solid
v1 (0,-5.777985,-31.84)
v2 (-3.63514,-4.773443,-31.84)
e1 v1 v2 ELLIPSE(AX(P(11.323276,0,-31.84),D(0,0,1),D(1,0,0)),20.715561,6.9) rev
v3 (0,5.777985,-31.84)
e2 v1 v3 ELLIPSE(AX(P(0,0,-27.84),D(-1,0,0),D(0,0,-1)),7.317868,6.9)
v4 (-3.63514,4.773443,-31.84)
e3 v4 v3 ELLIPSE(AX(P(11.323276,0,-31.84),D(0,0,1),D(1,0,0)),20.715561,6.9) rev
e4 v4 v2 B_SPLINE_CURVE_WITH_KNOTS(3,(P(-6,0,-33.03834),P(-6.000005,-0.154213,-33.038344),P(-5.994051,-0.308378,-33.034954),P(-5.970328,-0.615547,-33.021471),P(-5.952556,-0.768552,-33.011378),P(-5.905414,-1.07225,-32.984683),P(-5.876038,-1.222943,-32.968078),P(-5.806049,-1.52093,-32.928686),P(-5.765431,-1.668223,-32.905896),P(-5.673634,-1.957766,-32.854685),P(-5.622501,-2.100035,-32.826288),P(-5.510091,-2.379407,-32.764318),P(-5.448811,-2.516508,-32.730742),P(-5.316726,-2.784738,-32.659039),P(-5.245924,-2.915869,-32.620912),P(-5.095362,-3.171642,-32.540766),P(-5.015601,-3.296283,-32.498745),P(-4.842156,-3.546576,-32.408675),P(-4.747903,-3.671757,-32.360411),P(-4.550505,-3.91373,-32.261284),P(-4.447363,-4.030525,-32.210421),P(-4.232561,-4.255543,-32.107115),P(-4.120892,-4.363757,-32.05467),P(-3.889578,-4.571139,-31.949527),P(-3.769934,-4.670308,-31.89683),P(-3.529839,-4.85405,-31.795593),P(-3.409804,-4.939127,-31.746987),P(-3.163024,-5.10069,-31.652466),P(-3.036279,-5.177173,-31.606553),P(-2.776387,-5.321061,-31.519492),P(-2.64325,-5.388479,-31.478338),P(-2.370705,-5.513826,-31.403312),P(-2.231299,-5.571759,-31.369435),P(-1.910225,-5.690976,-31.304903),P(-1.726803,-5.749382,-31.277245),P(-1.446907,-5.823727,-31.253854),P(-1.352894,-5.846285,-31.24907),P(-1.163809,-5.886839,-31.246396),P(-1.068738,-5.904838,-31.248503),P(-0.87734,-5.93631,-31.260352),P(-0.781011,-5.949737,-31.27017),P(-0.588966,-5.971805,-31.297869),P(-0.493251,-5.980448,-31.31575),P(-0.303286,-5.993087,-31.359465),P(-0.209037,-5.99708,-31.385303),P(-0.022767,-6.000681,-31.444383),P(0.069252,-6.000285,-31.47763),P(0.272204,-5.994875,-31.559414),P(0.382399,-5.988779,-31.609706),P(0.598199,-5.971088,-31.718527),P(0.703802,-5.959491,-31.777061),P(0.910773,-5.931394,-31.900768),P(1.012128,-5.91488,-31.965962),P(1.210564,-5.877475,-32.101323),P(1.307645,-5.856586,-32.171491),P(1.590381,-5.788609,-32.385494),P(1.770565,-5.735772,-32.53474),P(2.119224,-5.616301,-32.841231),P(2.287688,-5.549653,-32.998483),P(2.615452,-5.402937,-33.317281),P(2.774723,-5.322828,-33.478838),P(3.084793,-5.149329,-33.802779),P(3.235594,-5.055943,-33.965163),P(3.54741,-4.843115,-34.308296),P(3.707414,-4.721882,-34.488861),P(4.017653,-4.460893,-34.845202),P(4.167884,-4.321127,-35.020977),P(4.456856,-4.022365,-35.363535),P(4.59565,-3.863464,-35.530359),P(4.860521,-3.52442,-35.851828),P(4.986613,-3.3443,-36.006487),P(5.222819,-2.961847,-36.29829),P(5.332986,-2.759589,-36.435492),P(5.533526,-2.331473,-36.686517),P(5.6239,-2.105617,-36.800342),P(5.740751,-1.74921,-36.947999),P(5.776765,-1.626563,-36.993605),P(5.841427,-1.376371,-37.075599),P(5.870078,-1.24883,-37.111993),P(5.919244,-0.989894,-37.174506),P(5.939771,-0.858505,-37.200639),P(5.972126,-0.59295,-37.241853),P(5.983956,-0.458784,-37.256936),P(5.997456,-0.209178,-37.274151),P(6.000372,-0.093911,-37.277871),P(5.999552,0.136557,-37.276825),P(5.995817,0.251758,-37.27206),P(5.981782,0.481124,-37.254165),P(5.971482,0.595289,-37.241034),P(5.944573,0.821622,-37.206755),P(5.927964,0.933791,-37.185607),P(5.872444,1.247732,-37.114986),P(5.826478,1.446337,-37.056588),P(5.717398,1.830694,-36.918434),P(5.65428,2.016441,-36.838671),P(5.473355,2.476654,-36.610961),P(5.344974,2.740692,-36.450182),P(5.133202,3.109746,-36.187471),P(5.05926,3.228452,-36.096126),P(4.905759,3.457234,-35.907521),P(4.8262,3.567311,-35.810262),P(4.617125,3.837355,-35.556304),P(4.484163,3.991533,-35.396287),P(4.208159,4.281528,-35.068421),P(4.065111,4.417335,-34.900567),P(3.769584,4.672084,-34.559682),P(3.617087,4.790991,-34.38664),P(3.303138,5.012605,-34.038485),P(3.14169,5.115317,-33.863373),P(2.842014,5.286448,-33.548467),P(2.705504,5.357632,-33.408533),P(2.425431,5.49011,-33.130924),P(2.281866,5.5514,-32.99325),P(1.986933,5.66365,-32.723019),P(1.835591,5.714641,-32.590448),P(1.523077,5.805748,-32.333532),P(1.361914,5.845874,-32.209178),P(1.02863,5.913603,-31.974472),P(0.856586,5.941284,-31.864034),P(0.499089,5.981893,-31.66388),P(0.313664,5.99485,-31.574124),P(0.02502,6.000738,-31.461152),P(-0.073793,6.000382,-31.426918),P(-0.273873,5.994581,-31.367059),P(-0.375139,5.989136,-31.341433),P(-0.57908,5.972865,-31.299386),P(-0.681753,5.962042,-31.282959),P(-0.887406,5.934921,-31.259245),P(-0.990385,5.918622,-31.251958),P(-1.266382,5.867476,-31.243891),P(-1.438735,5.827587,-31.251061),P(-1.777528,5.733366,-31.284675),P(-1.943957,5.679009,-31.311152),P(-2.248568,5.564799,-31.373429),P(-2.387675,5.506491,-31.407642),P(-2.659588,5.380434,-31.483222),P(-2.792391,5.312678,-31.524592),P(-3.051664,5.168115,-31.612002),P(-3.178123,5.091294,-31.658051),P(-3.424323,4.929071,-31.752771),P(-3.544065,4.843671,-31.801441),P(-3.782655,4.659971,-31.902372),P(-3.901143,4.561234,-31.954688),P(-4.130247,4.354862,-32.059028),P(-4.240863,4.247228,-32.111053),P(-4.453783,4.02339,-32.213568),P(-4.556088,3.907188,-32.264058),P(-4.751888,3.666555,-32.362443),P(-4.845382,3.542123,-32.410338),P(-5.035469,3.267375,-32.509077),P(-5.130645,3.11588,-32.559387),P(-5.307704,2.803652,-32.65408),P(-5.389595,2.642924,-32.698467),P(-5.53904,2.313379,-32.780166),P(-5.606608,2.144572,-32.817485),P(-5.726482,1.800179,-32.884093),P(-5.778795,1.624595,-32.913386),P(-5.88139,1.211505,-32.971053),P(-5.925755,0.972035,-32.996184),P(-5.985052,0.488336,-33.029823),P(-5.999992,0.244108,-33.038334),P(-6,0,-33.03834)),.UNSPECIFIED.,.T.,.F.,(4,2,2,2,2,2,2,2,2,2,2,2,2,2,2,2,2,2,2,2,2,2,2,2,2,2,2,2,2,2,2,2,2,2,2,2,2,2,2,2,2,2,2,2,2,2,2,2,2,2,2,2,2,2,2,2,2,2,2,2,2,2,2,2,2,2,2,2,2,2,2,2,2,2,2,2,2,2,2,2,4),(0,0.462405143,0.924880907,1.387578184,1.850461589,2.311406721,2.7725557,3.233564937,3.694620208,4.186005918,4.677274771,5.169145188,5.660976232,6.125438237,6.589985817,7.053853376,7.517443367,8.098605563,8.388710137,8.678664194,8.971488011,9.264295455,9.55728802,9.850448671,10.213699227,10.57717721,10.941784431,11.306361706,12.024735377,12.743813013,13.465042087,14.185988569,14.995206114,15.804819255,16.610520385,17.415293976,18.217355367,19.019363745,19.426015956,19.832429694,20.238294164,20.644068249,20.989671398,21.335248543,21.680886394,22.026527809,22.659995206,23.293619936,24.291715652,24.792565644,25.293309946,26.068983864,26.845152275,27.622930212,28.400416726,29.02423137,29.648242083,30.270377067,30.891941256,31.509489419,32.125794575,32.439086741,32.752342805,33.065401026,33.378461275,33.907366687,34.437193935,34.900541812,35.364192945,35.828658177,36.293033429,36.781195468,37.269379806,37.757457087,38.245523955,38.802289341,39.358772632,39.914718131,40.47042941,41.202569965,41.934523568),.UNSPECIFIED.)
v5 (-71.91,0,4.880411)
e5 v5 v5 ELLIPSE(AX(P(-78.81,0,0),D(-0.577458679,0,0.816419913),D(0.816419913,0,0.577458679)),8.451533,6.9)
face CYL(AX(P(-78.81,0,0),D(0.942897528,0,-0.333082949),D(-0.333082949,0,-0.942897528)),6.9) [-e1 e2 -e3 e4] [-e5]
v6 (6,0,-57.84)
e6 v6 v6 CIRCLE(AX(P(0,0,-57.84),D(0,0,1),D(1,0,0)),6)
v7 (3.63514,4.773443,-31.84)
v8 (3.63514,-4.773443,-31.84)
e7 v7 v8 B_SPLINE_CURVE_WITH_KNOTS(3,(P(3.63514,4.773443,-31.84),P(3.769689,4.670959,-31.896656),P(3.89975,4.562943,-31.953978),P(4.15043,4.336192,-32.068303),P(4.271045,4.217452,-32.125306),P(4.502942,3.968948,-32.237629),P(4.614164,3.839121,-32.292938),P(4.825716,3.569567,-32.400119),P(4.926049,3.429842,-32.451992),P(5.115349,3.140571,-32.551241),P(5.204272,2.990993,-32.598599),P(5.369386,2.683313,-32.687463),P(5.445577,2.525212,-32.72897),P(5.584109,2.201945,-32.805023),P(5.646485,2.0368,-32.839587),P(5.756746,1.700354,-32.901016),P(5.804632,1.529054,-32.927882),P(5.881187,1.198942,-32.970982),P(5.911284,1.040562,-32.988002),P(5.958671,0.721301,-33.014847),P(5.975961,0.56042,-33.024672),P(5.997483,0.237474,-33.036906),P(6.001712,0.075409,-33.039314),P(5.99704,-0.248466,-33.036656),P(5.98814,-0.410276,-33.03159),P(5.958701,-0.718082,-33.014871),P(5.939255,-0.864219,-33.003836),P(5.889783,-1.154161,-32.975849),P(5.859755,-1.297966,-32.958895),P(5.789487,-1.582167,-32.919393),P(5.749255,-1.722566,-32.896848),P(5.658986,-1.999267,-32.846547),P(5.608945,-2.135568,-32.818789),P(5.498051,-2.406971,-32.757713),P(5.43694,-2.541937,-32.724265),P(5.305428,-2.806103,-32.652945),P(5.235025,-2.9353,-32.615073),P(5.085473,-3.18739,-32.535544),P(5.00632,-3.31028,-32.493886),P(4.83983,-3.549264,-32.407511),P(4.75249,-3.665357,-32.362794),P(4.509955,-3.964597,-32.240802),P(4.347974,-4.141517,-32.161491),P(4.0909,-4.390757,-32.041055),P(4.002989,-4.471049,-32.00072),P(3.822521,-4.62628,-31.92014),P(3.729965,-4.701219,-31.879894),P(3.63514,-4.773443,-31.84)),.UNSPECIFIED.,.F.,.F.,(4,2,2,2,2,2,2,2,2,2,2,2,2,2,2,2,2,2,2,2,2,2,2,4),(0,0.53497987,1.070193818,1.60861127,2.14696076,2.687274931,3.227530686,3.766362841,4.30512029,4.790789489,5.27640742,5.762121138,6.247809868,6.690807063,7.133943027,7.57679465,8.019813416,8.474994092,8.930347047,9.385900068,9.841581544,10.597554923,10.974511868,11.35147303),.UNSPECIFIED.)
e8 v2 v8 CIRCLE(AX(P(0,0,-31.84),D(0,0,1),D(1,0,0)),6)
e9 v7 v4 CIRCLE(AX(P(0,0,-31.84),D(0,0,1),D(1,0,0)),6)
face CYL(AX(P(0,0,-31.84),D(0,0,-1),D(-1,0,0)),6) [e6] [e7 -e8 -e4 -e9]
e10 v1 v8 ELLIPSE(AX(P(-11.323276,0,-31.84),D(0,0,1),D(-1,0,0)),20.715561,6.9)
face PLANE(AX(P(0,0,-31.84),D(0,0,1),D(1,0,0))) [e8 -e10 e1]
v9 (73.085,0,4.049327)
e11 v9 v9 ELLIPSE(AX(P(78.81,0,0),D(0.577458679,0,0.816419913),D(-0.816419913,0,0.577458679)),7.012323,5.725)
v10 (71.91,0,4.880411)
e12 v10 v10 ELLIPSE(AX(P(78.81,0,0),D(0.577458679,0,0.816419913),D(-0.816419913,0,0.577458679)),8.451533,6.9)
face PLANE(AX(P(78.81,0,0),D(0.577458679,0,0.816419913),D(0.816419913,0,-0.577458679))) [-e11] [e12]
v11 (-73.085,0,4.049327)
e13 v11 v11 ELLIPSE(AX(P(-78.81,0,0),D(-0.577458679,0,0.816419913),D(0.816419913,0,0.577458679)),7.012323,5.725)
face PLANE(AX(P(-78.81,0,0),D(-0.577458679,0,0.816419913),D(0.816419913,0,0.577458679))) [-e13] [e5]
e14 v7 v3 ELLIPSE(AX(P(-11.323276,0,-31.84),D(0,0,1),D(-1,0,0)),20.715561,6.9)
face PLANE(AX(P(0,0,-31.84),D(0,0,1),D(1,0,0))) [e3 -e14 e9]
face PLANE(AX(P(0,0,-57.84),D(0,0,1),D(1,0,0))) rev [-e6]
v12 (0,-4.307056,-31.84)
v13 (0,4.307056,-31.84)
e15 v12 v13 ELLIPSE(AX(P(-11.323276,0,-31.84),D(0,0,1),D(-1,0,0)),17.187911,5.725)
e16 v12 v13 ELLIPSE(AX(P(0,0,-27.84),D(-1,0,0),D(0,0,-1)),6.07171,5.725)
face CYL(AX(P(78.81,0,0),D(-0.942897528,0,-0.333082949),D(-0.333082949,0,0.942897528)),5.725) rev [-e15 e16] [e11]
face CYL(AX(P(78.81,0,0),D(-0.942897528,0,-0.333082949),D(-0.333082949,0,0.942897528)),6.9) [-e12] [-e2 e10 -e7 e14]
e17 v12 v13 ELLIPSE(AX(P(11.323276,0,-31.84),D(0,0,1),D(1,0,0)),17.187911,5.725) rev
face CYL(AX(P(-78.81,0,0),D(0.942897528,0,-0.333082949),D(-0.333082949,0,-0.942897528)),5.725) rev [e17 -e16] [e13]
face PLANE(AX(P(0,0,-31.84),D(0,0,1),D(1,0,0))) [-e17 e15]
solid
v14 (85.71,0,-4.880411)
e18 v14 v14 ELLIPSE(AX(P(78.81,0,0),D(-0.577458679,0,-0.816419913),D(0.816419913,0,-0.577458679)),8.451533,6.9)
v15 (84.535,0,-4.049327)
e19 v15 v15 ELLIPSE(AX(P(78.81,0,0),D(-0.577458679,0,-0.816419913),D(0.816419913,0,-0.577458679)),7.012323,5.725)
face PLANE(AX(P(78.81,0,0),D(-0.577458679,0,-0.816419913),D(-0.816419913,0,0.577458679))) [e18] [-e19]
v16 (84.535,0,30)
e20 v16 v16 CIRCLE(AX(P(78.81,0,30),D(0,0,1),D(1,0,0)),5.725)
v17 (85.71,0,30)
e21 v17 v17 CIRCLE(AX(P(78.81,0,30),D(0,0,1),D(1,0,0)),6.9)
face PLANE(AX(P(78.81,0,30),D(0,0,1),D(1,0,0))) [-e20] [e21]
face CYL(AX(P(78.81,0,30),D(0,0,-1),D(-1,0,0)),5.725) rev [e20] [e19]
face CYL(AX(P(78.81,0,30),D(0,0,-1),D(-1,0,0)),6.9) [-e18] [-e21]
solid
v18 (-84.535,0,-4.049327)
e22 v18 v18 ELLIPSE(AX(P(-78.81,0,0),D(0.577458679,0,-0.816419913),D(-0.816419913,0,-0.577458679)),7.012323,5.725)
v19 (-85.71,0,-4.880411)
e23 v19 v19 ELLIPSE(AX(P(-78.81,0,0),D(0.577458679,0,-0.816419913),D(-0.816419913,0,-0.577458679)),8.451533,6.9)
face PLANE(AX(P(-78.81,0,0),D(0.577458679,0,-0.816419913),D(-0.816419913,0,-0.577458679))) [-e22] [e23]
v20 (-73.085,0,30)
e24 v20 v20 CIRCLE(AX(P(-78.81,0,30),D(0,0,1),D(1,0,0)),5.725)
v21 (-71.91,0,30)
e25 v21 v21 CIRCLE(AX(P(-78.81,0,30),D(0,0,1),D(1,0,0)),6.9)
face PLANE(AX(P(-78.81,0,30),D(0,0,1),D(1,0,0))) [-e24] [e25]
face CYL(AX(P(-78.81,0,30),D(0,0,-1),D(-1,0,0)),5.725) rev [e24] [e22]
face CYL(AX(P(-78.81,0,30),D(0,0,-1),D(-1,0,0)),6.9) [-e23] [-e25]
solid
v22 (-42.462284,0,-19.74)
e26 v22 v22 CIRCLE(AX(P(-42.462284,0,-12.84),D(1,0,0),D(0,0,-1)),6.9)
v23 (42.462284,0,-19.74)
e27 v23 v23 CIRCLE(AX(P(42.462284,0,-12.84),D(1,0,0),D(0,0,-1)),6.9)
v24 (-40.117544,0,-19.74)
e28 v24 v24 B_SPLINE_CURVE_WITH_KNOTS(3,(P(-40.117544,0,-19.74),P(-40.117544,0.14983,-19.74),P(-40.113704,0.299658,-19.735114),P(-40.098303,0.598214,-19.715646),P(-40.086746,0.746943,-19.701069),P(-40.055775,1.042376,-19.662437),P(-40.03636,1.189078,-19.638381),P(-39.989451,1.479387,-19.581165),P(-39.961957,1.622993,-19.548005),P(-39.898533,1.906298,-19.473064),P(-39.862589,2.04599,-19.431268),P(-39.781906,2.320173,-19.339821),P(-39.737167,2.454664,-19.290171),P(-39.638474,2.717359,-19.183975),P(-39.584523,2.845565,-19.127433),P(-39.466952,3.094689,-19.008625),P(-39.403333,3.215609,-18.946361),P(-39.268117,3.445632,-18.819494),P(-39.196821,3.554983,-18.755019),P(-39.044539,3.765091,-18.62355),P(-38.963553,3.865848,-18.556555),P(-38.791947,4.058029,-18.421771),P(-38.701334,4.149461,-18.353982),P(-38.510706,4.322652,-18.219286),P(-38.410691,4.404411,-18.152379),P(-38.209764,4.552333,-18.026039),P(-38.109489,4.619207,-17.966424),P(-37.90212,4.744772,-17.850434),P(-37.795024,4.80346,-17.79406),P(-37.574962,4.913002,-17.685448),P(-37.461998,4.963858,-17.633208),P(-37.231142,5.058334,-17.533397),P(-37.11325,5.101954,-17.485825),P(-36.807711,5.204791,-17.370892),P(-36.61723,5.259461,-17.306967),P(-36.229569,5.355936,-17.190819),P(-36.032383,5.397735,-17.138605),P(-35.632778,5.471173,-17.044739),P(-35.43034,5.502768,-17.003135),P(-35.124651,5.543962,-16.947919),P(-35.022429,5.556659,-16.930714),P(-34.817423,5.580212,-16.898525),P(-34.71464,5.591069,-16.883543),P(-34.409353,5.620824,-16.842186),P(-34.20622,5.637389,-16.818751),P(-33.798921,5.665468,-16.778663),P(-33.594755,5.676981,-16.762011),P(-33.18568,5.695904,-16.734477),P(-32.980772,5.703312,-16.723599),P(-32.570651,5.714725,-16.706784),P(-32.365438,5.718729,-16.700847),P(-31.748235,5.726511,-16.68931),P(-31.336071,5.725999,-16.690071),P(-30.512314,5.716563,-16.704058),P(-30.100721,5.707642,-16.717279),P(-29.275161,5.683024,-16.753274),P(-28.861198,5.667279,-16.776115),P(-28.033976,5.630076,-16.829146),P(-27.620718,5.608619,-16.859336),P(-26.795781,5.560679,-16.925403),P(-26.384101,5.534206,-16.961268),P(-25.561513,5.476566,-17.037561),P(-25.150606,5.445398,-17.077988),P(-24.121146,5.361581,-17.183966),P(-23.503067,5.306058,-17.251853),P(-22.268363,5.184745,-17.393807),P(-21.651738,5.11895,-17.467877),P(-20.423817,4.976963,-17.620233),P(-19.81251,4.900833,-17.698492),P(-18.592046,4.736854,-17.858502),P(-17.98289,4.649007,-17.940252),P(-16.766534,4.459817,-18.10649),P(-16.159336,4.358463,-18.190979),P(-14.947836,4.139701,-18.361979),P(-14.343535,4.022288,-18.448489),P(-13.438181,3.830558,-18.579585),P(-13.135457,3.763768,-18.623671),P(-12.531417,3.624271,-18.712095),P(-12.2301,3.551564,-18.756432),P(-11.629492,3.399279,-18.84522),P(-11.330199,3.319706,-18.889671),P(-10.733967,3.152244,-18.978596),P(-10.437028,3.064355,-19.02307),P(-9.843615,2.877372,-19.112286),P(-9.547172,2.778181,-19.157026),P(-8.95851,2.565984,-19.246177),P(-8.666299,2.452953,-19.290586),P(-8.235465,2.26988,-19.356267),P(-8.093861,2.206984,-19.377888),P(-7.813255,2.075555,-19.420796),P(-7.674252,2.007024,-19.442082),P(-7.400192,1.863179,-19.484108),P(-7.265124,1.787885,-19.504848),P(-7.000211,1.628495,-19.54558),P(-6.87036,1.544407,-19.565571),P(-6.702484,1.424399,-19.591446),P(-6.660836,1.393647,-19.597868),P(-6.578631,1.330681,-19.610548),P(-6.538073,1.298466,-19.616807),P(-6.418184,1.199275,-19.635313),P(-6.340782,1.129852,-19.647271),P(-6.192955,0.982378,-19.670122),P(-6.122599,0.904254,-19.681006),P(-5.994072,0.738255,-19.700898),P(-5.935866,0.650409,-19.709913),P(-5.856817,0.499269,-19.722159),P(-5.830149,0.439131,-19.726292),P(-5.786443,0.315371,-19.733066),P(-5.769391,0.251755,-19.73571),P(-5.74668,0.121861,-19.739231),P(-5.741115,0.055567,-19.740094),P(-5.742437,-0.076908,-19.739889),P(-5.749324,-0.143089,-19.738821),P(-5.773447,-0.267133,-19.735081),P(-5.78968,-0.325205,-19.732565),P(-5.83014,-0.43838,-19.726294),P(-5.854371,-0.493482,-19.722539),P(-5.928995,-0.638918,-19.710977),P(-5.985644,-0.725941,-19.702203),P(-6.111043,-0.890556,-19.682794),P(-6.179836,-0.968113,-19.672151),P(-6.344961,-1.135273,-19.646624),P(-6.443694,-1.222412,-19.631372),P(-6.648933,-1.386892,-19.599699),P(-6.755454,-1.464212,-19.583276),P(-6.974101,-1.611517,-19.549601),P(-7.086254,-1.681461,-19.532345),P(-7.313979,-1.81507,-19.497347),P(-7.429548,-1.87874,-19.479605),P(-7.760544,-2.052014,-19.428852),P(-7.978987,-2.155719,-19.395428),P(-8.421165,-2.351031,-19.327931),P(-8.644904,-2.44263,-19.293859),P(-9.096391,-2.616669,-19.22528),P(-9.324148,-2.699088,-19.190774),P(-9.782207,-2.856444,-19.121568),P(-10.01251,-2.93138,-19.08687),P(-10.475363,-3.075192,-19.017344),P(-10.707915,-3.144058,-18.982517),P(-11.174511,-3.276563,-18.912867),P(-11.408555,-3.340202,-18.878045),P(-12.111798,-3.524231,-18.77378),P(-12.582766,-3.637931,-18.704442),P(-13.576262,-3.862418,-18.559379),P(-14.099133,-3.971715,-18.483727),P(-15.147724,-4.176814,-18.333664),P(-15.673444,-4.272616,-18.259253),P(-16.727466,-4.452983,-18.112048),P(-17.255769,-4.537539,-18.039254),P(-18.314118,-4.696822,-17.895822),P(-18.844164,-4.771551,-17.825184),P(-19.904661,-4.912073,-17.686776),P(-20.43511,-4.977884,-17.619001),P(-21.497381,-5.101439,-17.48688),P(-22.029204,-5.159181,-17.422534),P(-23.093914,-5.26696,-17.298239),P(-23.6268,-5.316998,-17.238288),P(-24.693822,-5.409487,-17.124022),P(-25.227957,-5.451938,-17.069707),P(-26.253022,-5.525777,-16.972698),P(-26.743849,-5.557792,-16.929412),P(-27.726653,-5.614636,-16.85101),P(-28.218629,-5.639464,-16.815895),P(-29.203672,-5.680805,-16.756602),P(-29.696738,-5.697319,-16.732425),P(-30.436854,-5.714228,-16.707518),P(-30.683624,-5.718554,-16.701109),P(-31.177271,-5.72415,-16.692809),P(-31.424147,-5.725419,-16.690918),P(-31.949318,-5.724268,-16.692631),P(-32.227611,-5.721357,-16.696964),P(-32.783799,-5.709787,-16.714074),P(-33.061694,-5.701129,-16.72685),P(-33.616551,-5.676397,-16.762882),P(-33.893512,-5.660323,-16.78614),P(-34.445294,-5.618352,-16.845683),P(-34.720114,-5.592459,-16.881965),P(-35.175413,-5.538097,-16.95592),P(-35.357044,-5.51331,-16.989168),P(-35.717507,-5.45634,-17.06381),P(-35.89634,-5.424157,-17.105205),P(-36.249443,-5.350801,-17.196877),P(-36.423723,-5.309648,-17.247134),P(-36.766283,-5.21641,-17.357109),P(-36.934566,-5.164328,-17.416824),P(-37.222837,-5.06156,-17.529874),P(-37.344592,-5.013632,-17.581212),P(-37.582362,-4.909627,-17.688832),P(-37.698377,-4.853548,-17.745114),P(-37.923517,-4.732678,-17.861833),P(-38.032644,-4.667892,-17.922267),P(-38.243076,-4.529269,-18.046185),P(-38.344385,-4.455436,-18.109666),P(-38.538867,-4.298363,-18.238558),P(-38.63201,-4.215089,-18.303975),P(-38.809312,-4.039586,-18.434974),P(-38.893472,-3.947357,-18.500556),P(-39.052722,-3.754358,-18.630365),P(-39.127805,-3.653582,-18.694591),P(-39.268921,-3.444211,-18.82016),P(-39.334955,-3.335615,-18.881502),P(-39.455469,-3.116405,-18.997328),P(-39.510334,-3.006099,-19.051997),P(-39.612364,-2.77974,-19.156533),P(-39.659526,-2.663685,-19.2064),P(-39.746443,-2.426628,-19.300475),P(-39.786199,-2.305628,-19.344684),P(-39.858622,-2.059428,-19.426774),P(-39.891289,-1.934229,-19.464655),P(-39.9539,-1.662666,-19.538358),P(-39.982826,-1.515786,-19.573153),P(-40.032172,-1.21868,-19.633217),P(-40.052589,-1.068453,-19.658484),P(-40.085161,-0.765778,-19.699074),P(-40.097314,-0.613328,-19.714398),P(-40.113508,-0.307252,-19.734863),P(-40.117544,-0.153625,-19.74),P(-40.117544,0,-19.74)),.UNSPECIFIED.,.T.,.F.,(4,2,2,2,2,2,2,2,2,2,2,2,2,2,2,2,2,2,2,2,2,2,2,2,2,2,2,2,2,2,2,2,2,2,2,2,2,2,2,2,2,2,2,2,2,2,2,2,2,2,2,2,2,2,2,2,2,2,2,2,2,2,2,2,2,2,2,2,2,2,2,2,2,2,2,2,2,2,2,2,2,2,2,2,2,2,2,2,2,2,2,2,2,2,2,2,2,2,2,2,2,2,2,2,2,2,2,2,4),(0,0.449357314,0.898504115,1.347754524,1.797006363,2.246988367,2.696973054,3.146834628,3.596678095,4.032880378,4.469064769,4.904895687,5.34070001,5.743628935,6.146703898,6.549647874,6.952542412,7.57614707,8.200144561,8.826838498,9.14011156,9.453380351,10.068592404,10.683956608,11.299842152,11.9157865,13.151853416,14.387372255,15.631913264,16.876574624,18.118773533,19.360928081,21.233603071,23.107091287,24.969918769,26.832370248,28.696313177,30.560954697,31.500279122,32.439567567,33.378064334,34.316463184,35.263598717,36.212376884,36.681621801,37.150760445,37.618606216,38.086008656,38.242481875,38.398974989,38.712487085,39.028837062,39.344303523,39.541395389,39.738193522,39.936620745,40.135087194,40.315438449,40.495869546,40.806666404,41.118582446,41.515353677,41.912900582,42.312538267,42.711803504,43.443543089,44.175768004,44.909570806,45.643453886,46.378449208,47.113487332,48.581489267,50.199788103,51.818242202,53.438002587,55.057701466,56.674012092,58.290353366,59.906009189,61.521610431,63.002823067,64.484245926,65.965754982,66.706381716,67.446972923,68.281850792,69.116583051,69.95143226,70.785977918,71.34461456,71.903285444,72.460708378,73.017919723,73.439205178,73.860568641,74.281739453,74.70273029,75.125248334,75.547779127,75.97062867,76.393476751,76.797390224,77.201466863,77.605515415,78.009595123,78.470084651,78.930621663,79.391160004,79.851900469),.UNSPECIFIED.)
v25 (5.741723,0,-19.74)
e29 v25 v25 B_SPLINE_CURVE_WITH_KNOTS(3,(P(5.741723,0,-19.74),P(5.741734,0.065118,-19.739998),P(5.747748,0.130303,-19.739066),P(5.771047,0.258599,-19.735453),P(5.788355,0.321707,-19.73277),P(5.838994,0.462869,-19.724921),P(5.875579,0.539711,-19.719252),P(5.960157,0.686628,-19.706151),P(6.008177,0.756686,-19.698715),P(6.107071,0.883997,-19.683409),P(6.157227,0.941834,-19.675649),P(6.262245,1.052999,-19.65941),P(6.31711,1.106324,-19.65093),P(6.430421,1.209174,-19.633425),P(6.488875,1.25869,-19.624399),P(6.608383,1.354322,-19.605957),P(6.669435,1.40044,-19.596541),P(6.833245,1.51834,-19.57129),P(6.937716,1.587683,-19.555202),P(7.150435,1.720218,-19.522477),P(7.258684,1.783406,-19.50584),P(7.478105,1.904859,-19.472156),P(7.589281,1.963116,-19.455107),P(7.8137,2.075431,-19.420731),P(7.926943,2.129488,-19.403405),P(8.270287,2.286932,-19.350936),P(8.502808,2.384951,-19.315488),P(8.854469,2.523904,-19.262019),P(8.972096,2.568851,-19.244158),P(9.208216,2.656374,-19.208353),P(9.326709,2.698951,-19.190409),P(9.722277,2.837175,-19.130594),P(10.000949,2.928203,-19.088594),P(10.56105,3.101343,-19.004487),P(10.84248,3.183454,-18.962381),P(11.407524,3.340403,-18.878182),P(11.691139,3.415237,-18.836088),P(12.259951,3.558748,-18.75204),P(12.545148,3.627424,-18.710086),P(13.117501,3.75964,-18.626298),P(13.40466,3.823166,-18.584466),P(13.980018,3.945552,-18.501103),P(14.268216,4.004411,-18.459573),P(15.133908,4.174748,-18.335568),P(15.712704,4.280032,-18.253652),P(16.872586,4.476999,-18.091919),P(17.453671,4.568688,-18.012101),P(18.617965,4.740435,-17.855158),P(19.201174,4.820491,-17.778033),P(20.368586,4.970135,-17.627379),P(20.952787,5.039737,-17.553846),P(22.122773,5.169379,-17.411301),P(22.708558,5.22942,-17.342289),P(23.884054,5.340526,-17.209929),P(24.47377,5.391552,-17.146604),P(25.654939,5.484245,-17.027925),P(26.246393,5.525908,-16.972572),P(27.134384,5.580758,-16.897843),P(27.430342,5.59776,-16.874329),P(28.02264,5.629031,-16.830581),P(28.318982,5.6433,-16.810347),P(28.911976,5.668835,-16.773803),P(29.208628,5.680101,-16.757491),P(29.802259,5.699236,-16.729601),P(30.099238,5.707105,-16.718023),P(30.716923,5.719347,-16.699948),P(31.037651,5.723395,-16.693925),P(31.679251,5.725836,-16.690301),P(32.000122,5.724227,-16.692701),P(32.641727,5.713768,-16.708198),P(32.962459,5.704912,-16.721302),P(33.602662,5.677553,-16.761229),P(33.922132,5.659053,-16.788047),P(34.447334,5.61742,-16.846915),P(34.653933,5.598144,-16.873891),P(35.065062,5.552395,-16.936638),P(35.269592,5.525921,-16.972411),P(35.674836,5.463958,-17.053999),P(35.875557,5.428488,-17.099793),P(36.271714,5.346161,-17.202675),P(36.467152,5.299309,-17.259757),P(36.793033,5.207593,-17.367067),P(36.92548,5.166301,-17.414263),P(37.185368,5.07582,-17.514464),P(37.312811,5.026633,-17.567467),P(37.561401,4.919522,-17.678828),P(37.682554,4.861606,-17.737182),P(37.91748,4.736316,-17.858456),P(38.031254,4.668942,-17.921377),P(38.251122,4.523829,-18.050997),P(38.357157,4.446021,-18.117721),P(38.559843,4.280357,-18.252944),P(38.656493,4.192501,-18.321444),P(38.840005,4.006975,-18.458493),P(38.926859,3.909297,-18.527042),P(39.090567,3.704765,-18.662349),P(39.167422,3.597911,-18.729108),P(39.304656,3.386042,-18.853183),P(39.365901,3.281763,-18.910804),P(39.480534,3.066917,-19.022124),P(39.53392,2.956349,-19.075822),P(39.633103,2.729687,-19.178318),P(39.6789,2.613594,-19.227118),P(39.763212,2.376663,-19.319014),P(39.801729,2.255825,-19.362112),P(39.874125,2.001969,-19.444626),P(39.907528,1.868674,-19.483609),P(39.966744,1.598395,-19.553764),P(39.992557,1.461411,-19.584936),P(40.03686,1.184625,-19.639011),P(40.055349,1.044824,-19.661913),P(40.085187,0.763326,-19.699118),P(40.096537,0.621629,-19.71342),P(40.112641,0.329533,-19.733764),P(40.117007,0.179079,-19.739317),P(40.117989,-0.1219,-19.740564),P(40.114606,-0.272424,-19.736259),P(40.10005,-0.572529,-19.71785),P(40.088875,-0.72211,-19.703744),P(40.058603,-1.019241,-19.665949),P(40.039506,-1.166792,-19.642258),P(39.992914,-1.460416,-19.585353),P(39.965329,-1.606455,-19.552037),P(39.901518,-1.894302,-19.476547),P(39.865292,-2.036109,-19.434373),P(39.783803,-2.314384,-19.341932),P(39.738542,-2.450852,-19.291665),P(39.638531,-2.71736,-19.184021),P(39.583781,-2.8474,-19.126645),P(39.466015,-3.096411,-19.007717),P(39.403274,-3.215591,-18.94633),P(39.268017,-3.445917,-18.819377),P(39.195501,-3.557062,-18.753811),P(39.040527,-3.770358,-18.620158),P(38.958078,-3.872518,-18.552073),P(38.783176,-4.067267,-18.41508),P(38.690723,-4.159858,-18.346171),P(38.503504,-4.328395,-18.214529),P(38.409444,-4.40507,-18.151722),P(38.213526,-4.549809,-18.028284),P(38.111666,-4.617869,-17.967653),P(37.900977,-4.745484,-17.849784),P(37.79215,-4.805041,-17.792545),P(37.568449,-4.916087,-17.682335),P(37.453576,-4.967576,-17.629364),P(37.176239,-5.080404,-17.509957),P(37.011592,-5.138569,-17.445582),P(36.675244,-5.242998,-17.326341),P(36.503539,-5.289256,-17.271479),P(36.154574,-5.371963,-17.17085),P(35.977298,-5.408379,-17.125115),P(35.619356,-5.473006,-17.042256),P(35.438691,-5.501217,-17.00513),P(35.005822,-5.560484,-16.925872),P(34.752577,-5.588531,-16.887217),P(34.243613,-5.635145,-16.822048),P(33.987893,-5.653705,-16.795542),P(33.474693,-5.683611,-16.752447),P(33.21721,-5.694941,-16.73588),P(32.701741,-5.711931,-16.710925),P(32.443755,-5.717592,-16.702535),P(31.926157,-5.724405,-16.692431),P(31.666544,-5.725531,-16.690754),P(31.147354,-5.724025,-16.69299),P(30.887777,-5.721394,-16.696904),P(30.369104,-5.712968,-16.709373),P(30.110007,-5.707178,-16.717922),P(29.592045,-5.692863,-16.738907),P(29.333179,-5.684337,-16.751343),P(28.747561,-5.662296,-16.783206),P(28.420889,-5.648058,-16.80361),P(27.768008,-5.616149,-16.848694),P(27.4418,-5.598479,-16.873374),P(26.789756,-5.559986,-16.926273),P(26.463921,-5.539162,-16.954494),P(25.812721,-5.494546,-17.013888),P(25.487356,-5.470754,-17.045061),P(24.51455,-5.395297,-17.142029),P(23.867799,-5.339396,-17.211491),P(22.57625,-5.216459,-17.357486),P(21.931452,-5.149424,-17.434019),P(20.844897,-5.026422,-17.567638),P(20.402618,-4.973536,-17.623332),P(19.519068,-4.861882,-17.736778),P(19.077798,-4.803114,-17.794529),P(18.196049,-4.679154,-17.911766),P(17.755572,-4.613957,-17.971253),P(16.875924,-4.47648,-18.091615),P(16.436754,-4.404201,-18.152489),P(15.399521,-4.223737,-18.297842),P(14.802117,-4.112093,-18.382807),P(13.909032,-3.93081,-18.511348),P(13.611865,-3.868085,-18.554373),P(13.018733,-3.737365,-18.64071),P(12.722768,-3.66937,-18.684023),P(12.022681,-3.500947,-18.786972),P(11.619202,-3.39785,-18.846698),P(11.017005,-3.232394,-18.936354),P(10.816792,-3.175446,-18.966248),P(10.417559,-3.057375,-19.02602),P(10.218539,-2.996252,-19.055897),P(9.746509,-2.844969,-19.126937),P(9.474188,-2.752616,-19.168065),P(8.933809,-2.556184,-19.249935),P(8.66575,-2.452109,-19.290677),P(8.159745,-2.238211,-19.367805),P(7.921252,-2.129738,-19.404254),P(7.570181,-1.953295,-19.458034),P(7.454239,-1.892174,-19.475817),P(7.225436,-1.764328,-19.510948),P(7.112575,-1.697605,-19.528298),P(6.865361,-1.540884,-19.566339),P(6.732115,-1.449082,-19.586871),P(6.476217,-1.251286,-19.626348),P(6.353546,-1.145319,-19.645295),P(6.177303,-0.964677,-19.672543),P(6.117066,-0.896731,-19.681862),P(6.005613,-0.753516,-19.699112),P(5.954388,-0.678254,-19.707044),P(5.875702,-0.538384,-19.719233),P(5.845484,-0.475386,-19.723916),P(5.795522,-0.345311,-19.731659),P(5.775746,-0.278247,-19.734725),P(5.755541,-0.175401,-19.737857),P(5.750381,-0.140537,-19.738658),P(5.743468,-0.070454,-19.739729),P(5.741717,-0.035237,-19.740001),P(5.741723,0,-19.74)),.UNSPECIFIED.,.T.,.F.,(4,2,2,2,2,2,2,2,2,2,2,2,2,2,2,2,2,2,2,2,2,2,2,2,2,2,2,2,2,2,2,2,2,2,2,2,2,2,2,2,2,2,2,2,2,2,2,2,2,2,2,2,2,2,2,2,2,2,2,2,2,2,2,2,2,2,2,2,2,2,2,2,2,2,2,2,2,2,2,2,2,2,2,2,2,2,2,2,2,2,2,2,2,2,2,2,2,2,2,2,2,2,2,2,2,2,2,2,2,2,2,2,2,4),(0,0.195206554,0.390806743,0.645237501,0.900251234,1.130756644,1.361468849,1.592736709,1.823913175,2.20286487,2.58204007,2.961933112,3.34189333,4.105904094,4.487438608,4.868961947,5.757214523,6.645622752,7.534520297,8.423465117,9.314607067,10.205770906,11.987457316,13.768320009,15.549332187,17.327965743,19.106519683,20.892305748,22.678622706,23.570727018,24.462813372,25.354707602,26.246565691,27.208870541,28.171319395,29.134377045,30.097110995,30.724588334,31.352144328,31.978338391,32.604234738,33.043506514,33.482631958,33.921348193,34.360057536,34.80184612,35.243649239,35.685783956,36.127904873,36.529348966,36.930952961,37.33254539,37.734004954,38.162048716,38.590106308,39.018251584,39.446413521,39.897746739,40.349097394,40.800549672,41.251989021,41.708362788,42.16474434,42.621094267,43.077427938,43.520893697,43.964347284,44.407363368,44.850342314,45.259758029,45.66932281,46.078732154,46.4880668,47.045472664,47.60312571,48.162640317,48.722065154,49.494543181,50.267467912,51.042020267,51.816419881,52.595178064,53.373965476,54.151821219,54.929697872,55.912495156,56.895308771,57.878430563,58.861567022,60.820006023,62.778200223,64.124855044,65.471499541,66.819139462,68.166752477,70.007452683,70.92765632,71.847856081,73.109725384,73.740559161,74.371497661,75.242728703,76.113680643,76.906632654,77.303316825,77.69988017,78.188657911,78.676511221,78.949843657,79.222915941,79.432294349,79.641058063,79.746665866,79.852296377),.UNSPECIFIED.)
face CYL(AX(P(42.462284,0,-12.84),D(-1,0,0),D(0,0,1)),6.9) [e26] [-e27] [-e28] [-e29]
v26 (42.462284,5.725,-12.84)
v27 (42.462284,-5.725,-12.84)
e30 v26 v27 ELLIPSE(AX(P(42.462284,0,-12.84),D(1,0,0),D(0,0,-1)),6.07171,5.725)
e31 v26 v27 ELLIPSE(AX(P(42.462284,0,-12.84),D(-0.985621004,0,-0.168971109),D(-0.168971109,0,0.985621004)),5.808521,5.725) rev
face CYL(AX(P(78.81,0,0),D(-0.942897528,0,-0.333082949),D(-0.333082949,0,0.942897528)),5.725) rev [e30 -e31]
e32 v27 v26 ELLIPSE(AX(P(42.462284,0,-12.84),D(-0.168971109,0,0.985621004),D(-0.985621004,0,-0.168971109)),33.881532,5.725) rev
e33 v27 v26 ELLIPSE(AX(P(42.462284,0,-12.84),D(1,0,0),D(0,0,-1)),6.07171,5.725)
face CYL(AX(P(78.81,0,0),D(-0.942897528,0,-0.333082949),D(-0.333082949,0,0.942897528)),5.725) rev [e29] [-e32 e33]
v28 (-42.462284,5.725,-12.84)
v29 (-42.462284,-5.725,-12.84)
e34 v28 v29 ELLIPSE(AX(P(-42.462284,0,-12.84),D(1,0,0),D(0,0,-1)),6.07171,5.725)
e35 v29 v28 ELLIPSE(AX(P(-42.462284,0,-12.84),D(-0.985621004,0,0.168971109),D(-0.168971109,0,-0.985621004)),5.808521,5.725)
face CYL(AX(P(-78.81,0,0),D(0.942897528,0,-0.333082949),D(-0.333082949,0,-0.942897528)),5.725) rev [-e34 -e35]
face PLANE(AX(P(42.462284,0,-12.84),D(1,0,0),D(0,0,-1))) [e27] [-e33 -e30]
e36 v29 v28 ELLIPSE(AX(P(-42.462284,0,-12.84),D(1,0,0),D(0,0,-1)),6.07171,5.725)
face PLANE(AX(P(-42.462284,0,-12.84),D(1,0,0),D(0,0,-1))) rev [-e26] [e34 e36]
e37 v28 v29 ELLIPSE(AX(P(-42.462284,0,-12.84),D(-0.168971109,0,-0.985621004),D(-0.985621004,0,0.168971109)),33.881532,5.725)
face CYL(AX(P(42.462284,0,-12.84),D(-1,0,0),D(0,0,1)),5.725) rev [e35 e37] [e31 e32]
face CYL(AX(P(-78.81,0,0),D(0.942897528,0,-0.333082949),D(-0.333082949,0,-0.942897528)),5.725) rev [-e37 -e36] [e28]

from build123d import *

# Parameters (mm, degrees)
SKETCH1_R                                      = 6.9
SKETCH1_R_2                                    = 5.725
C_PROGRAM_FILES_SOLIDWORKS_CORP_SOLIDWOR_DEPTH = 91.484727216
SKETCH1_ON_SEGMENT_2_R                         = 6.9
SKETCH1_ON_SEGMENT_2_R_2                       = 5.725
C_PROGRAM_FILES_SOLIDWORKS_CORP_SOLI_3_DEPTH   = 37.901943701
SKETCH11_R                                     = 6.9
SKETCH11_R_2                                   = 5.725
CIRCULAR_TUBE_26_9_X_2_3_2_DEPTH               = 91.484727216
SKETCH11_ON_SEGMENT_2_R                        = 6.9
SKETCH11_ON_SEGMENT_2_R_2                      = 5.725
CIRCULAR_TUBE_26_9_X_2_3_2_2_DEPTH             = 37.901943701
SKETCH12_R                                     = 6.9
SKETCH12_R_2                                   = 5.725
CIRCULAR_TUBE_26_9_X_2_3_3_DEPTH               = 84.924568966
WELD_TRIM_1_OUTLINE_W                          = 5.725
WELD_TRIM_1_OUTLINE_H                          = 38.951410817
WELD_TRIM_2_OUTLINE_W                          = 5.725
WELD_TRIM_2_OUTLINE_H                          = 38.951445723
PART_START                                     = 2e-09
PART_RUN_ON_DEPTH                              = 73.1683
BODY_START                                     = -3e-09
BODY_3_RUN_ON_DEPTH                            = 58.289875
SKETCH_10_R                                    = 6
EXTRUDE_3_DEPTH                                = 26


# Read off the part's stored shape, not the designer's step: 잘라내기/늘리기1, 잘라내기/늘리기2
with BuildPart() as part:
    # Sketch1 → C_PROGRAM FILES_SOLIDWORKS CORP_SOLIDWOR (new body)
    with BuildSketch(Plane(origin=(0, 0, -27.84), x_dir=(0.3330829487777661, 0, 0.9428975284905078), z_dir=(-0.9428975284905078, 0, 0.33308294877776606))):
        Circle(SKETCH1_R)
        Circle(SKETCH1_R_2, mode=Mode.SUBTRACT)
    extrude(amount=C_PROGRAM_FILES_SOLIDWORKS_CORP_SOLIDWOR_DEPTH)

    # C_PROGRAM FILES_SOLIDWORKS CORP_SOLI 2
    split(bisect_by=Plane(origin=(-78.81, 0, 0), x_dir=(0, 1, 0), z_dir=(0.577458679, 0, -0.816419913)), keep=Keep.TOP)

    # Sketch1 → part run on (add)
    with BuildSketch(Plane(origin=(0, 0, -27.84), x_dir=(0.3330829487777661, 0, 0.9428975284905078), z_dir=(-0.9428975284905078, 0, 0.33308294877776606)).offset(PART_START)):
        Circle(SKETCH1_R)
        Circle(SKETCH1_R_2, mode=Mode.SUBTRACT)
    extrude(amount=-PART_RUN_ON_DEPTH)

    # Weld Trim 3
    split(bisect_by=Plane(origin=(0, 0, -27.84), x_dir=(0, -1, 0), z_dir=(-1, 0, 0)), keep=Keep.TOP)



with BuildPart() as body_2:
    # Sketch1 on segment 2 (carried to segment 2) → C_PROGRAM FILES_SOLIDWORKS CORP_SOLI 3 (new body)
    with BuildSketch(Plane(origin=(-78.81, 0, -7.901943701), x_dir=(1, 0, 0), z_dir=(0, 0, 1))):
        Circle(SKETCH1_ON_SEGMENT_2_R)
        Circle(SKETCH1_ON_SEGMENT_2_R_2, mode=Mode.SUBTRACT)
    extrude(amount=C_PROGRAM_FILES_SOLIDWORKS_CORP_SOLI_3_DEPTH)

    # C_PROGRAM FILES_SOLIDWORKS CORP_SOLI 3 m
    split(bisect_by=Plane(origin=(-78.81, 0, 0), x_dir=(0, -1, 0), z_dir=(-0.577458679, 0, 0.816419913)), keep=Keep.TOP)


with BuildPart() as body_3:
    # Sketch11 → Circular tube 26.9 X 2.3(2) (new body)
    with BuildSketch(Plane(origin=(0, 0, -27.84), x_dir=(0.33308294877776584, 0, -0.9428975284905079), z_dir=(0.9428975284905079, 0, 0.33308294877776584))):
        Circle(SKETCH11_R)
        Circle(SKETCH11_R_2, mode=Mode.SUBTRACT)
    extrude(amount=CIRCULAR_TUBE_26_9_X_2_3_2_DEPTH)

    # Circular tube 26.9 X 2.3(2) mitre 1
    split(bisect_by=Plane(origin=(78.81, 0, 0), x_dir=(0, -1, 0), z_dir=(-0.577458679, 0, -0.816419913)), keep=Keep.TOP)

    # Sketch11 → body 3 run on (add)
    with BuildSketch(Plane(origin=(0, 0, -27.84), x_dir=(0.33308294877776584, 0, -0.9428975284905079), z_dir=(0.9428975284905079, 0, 0.33308294877776584)).offset(BODY_START)):
        Circle(SKETCH11_R)
        Circle(SKETCH11_R_2, mode=Mode.SUBTRACT)
    extrude(amount=-BODY_3_RUN_ON_DEPTH)

    # Weld Trim 3
    split(bisect_by=Plane(origin=(0, 0, -27.84), x_dir=(0, 1, 0), z_dir=(1, 0, 0)), keep=Keep.TOP)


with BuildPart() as body_4:
    # Sketch11 on segment 2 (carried to segment 2) → Circular tube 26.9 X 2.3_2 2 (new body)
    with BuildSketch(Plane(origin=(78.81, 0, -7.901943701), x_dir=(1, 0, 0), z_dir=(0, 0, 1))):
        Circle(SKETCH11_ON_SEGMENT_2_R)
        Circle(SKETCH11_ON_SEGMENT_2_R_2, mode=Mode.SUBTRACT)
    extrude(amount=CIRCULAR_TUBE_26_9_X_2_3_2_2_DEPTH)

    # Circular tube 26.9 X 2.3_2 2 mitre 1
    split(bisect_by=Plane(origin=(78.81, 0, 0), x_dir=(0, 1, 0), z_dir=(0.577458679, 0, 0.816419913)), keep=Keep.TOP)


with BuildPart() as body_5:
    # Sketch12 → Circular tube 26.9 X 2.3(3) (new body)
    with BuildSketch(Plane(origin=(-42.462284483, 0, -12.84), x_dir=(0, 0, -1), z_dir=(1, 0, 0))):
        Circle(SKETCH12_R)
        Circle(SKETCH12_R_2, mode=Mode.SUBTRACT)
    extrude(amount=CIRCULAR_TUBE_26_9_X_2_3_3_DEPTH)

    # Weld Trim 1 outline → Weld Trim 1 (revolve, cut)
    with BuildSketch(Plane(origin=(8.743516403, 0, -24.751312059), x_dir=(0, 1, 0), z_dir=(0.333082948777766, 0, -0.942897528490508))):
        with Locations((2.8625, 18.314360576)):
            Rectangle(WELD_TRIM_1_OUTLINE_W, WELD_TRIM_1_OUTLINE_H)
    revolve(axis=Axis((8.743516403, 0, -24.751312059), (0.942897528490508, 0, 0.333082948777766)), mode=Mode.SUBTRACT)

    # Weld Trim 2 outline → Weld Trim 2 (revolve, cut)
    with BuildSketch(Plane(origin=(-8.743516403, 0, -24.751312059), x_dir=(0, 1, 0), z_dir=(-0.333082948777766, 0, -0.942897528490508))):
        with Locations((2.8625, -18.314343123)):
            Rectangle(WELD_TRIM_2_OUTLINE_W, WELD_TRIM_2_OUTLINE_H)
    revolve(axis=Axis((-8.743516403, 0, -24.751312059), (0.942897528490508, 0, -0.333082948777766)), mode=Mode.SUBTRACT)


with BuildPart() as part_1:
    add(part.part)

    add(body_3.part)  # 보스-돌출3 merges body 3
    # 스케치10 → 보스-돌출3 (add)
    with BuildSketch(Plane.XY.offset(-57.84)):
        with Locations(Location((0, 0, 0), (0, 0, 127.290512292))):
            Circle(SKETCH_10_R)
    extrude(amount=EXTRUDE_3_DEPTH)


solid = Compound([body_2.part, body_4.part, body_5.part, part_1.part])
